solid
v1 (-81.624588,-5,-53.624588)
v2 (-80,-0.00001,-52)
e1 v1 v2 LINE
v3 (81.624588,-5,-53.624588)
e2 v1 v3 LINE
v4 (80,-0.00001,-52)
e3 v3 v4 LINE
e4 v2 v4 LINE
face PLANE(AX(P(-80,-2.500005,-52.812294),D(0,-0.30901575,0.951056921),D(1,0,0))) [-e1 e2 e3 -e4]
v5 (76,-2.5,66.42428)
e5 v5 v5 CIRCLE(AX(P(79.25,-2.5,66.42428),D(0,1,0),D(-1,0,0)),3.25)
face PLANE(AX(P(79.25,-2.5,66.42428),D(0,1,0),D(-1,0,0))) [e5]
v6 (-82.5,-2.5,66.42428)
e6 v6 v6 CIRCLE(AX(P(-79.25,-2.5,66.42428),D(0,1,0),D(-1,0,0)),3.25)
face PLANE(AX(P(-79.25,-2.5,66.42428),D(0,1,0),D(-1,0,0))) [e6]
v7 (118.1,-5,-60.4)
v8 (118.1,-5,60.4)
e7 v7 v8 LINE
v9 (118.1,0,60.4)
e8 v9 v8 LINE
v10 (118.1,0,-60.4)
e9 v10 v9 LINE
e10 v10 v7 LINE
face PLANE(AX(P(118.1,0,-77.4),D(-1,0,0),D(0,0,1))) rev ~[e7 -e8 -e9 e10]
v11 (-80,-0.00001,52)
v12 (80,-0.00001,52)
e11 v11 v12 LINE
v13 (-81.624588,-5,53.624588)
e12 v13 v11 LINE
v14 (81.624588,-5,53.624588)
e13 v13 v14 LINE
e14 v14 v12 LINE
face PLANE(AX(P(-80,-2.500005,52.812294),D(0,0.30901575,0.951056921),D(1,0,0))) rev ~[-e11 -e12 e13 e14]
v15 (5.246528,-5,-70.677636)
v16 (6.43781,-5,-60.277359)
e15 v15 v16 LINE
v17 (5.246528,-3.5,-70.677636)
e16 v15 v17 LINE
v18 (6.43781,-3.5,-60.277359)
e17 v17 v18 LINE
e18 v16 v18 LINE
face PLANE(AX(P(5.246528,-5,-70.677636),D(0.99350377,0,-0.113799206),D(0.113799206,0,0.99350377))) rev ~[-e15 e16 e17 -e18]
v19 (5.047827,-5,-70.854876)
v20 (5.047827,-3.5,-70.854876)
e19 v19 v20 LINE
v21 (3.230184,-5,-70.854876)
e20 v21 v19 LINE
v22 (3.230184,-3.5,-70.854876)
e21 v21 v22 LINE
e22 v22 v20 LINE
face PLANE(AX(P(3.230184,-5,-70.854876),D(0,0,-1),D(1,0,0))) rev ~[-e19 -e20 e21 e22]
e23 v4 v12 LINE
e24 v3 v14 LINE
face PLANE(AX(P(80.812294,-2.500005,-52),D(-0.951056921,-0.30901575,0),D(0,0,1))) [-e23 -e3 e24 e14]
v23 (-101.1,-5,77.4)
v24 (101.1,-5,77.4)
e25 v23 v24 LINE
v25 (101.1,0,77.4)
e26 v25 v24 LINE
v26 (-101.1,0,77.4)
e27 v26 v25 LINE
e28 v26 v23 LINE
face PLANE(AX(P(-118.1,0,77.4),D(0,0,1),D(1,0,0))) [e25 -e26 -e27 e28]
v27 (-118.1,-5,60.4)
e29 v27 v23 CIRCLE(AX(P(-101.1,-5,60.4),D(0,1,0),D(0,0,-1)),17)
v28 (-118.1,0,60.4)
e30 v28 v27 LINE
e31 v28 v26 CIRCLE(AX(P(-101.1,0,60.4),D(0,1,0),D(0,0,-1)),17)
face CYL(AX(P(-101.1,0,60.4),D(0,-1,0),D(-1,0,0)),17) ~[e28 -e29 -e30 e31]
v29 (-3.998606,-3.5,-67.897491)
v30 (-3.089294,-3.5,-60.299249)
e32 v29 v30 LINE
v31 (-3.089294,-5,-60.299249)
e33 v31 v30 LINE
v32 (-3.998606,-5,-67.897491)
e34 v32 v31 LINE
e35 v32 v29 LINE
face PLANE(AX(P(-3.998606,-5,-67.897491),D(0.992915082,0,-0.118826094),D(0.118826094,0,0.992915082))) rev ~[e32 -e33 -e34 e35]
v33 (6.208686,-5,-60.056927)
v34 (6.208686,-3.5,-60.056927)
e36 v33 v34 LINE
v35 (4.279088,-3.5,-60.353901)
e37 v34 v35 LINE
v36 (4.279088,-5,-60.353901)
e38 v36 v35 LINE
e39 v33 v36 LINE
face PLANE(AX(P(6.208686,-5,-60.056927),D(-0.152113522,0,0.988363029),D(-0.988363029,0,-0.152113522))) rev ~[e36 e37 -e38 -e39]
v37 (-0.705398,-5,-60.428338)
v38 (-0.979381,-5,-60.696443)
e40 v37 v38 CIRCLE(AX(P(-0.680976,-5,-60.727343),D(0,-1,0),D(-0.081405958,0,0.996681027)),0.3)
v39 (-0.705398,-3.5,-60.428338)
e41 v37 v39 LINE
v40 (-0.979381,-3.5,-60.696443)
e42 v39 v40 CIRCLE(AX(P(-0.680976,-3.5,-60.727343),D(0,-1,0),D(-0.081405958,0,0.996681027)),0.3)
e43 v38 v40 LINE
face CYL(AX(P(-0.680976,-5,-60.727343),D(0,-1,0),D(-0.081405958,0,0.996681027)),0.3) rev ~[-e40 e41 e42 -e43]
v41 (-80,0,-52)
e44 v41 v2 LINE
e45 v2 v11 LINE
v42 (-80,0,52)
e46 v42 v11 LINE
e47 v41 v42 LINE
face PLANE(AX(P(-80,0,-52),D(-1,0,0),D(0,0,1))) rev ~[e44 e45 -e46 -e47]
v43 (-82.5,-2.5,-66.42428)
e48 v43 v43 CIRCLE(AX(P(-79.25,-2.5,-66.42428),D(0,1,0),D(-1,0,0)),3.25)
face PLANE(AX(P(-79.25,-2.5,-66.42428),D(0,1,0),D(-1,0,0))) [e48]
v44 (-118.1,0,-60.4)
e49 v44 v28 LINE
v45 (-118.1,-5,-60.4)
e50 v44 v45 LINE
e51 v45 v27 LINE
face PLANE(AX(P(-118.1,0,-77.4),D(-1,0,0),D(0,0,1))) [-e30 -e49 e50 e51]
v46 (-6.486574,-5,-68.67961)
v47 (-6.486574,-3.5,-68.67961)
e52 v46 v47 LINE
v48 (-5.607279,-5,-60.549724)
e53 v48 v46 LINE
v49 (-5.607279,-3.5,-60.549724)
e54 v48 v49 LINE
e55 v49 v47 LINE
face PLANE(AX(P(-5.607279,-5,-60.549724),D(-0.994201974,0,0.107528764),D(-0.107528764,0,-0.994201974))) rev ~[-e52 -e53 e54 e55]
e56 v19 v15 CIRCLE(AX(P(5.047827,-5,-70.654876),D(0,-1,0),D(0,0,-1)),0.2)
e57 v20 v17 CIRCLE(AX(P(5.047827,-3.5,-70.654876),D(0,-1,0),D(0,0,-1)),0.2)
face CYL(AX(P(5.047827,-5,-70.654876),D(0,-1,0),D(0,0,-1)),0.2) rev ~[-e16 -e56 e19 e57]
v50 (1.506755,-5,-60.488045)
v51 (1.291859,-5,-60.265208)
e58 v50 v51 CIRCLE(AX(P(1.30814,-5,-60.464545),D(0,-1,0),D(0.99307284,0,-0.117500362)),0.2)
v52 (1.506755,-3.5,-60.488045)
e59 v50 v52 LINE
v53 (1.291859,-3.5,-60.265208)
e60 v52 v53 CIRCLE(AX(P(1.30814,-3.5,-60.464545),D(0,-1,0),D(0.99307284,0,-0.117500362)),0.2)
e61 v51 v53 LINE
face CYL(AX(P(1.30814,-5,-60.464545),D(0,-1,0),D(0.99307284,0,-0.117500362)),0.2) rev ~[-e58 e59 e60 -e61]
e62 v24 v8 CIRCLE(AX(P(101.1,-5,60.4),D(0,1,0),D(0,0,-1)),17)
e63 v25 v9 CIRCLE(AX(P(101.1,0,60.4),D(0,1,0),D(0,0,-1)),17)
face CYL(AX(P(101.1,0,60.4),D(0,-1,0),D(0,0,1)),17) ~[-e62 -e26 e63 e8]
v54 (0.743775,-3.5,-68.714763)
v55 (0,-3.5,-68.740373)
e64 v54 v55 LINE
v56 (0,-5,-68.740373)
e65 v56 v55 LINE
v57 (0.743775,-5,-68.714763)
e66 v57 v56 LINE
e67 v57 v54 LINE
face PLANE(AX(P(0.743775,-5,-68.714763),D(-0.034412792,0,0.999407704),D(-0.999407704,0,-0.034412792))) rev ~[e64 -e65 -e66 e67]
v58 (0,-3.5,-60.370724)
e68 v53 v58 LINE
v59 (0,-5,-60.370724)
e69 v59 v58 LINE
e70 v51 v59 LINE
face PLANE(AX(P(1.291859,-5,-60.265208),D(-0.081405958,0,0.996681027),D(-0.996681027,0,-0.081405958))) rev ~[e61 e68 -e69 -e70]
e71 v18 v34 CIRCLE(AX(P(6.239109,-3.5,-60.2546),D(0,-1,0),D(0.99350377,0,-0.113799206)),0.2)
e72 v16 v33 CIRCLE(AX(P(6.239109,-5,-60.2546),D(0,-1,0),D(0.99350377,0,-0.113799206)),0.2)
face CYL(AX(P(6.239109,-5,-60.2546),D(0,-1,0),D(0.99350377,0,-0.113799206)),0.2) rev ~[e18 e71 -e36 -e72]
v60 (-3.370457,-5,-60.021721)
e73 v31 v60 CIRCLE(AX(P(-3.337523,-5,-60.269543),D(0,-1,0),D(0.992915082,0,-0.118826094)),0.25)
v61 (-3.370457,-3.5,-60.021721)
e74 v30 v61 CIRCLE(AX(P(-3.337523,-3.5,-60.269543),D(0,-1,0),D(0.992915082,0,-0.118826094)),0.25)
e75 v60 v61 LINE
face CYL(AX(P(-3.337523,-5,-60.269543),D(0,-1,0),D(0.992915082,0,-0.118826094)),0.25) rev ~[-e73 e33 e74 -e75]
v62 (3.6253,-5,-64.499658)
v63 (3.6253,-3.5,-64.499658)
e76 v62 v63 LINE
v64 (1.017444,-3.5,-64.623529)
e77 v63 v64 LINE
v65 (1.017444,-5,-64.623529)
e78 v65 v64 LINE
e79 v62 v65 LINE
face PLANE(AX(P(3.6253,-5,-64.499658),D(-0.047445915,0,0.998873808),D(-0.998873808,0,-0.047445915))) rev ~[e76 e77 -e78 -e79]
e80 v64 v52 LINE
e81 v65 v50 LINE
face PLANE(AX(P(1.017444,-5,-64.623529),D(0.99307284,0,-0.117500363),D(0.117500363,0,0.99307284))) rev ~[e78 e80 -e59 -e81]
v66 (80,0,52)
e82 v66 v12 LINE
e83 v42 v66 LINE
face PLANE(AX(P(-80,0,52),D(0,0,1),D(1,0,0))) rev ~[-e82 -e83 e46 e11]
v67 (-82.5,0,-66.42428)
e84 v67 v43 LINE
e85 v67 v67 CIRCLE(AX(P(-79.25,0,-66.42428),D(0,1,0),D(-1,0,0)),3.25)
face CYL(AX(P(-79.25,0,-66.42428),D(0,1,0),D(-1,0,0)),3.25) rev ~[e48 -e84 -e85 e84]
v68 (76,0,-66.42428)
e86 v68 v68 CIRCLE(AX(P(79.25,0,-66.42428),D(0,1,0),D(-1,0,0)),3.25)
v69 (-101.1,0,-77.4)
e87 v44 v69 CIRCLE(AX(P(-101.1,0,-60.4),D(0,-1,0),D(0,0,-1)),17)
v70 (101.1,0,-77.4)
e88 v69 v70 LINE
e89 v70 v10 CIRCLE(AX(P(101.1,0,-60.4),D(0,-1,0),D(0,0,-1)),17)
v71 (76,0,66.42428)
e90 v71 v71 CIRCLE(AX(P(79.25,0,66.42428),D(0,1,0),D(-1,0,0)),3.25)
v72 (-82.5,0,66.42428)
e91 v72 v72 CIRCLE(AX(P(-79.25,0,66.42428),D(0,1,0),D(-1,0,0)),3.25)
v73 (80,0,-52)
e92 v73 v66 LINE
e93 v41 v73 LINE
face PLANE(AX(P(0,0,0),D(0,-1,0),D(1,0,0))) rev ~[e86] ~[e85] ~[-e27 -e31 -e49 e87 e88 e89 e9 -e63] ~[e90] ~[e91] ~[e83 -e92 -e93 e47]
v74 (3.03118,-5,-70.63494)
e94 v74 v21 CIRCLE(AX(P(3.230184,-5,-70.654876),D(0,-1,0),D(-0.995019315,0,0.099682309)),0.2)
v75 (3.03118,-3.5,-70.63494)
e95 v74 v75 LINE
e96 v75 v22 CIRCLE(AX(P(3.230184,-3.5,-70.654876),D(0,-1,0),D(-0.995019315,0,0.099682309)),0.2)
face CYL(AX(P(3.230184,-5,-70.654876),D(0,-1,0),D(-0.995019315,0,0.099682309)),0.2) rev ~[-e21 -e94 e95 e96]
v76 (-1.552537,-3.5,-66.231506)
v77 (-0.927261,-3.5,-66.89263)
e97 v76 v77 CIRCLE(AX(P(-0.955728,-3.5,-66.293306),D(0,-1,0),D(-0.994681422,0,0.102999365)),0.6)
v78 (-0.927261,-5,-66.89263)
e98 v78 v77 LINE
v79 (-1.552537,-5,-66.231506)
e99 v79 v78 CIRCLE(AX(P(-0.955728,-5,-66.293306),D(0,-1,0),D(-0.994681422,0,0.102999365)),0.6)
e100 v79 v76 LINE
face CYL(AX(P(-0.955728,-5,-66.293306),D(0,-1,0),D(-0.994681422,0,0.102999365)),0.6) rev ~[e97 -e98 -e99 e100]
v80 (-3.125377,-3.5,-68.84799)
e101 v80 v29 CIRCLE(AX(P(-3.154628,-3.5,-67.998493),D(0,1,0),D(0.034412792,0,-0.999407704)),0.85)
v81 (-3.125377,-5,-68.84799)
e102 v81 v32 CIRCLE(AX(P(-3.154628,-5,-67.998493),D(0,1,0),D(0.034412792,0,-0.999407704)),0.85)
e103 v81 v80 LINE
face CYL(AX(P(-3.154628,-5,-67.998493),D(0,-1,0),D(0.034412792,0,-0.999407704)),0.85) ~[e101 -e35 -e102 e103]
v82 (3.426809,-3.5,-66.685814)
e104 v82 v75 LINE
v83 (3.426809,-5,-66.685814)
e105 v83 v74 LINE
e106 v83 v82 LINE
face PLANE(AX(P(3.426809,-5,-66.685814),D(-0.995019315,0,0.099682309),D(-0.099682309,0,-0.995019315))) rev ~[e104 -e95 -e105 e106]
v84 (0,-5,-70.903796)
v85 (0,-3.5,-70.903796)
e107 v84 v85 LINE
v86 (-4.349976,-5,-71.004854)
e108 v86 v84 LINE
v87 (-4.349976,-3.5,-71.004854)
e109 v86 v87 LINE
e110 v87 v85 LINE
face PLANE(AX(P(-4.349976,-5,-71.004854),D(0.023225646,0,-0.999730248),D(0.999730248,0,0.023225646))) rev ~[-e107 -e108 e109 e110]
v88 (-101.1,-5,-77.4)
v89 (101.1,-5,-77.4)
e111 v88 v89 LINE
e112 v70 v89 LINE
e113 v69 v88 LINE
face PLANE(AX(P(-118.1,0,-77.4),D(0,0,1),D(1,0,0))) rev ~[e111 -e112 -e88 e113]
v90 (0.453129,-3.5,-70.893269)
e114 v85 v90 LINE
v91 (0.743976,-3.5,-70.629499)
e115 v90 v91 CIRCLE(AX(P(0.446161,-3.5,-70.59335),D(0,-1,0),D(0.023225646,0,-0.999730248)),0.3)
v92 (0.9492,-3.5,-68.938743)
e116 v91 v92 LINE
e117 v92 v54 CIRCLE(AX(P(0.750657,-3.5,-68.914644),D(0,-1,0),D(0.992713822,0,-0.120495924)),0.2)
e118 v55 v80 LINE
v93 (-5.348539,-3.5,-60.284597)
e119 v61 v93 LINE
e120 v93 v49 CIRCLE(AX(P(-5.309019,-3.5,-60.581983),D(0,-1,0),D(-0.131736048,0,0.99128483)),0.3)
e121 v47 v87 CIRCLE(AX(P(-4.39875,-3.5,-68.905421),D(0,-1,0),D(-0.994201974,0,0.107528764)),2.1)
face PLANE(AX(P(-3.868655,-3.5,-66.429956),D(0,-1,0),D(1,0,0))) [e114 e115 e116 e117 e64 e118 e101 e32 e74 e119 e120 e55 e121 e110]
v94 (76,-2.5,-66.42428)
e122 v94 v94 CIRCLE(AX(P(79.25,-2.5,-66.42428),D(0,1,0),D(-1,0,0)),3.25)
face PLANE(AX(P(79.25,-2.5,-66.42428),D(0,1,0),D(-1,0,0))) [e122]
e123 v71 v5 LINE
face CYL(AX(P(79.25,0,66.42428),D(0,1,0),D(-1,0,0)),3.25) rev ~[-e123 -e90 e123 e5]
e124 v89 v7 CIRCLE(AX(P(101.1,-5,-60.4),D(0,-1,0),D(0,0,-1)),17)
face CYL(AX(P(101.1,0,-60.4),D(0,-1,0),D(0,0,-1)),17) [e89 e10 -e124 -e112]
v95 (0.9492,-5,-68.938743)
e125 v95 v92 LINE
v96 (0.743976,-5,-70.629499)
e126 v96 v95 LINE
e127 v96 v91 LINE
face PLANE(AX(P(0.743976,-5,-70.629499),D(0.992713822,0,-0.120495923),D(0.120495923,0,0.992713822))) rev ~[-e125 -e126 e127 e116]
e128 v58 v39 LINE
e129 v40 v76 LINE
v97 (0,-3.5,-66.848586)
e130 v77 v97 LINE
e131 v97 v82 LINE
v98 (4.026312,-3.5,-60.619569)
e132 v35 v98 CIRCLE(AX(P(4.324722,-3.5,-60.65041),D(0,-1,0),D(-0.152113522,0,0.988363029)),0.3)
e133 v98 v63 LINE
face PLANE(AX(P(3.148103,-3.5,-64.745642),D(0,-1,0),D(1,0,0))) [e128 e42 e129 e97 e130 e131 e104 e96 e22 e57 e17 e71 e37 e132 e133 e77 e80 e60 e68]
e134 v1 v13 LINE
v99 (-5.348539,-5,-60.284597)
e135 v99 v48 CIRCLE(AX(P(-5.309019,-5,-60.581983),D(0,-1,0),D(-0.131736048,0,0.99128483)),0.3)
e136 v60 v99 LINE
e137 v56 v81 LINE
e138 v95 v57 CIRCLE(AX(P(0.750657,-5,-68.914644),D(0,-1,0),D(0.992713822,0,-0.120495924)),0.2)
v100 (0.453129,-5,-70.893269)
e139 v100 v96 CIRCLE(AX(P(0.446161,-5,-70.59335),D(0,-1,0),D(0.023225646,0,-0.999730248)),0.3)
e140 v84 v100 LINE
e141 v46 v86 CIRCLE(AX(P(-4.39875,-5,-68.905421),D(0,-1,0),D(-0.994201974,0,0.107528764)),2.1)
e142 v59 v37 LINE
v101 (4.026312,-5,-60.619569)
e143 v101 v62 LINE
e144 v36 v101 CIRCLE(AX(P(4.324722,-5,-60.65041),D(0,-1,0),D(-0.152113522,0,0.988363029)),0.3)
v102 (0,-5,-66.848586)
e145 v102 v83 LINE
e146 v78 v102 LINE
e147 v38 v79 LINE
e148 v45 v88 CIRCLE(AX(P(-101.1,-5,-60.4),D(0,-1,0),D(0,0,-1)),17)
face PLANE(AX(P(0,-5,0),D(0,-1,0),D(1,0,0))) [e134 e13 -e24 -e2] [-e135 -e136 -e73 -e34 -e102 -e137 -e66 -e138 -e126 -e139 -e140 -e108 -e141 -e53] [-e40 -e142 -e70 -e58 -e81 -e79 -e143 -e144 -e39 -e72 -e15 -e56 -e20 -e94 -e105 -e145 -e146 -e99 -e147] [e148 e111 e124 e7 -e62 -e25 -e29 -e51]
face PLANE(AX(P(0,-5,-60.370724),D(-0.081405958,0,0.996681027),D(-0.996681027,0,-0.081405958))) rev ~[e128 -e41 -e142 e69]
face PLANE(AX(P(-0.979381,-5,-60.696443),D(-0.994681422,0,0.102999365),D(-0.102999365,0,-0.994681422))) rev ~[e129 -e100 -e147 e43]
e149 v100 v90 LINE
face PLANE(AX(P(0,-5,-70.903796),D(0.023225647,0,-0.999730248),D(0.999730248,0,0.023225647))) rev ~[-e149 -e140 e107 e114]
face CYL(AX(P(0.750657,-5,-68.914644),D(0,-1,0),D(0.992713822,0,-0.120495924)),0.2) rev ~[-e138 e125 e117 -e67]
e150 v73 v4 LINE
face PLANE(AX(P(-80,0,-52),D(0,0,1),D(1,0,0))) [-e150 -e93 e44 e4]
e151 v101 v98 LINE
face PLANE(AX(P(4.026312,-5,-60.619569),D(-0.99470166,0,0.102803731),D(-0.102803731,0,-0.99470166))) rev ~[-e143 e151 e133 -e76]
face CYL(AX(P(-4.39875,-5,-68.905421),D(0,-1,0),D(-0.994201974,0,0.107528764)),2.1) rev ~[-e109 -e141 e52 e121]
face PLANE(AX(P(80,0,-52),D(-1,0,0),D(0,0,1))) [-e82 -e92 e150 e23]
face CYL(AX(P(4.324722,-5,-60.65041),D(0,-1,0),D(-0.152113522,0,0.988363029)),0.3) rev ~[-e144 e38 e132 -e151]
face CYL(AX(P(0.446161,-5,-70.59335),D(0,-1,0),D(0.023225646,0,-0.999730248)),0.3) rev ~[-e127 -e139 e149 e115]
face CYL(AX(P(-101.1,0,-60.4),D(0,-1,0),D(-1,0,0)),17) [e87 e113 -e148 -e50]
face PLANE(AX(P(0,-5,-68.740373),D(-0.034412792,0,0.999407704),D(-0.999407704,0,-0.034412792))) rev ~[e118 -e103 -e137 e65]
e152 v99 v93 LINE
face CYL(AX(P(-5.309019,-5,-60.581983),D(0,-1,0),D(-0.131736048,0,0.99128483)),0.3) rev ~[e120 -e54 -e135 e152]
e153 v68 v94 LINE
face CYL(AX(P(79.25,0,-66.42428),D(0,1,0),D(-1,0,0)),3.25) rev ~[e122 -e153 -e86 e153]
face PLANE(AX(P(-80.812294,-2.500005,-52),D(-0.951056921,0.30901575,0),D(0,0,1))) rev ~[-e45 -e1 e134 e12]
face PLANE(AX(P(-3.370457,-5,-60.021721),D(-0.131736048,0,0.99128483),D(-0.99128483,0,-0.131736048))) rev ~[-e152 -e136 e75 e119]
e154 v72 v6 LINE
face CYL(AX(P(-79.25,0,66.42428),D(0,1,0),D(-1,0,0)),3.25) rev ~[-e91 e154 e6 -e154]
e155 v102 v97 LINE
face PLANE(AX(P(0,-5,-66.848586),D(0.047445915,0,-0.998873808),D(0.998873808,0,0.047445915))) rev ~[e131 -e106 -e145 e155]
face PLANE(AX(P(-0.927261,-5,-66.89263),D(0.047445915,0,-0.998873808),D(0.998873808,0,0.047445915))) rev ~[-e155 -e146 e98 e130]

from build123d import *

# Parameters (mm, degrees)
F0_W     = 236.2
F0_H     = 154.8
F0_W_2   = 160
F0_H_2   = 104
F1_DEPTH = 5
F2_R     = 17
F3_R     = 3.25
F4_DEPTH = 2.5
F5_SIZE2 = 4.99999
F5_SIZE  = 1.624588
F7_DEPTH = 1.5


# Not quite as in the source:
# - a fillet or chamfer is up to 0.001 mm smaller than in the source, because OpenCascade refuses the exact size


with BuildPart() as f1:
    # F0 (on Front) → F1 (new body)
    with BuildSketch(Plane.XZ):
        Rectangle(F0_W, F0_H)
        Rectangle(F0_W_2, F0_H_2, mode=Mode.SUBTRACT)
    extrude(amount=F1_DEPTH)

    # F2
    f2_edges = [f1.edges().sort_by_distance(p)[0] for p in [
        (-118.1, -2.5, 77.4),
        (118.1, -2.5, 77.4),
        (-118.1, -2.5, -77.4),
        (118.1, -2.5, -77.4),
    ]]
    fillet(f2_edges, radius=F2_R)

    # F3 (on face) → F4 (cut)
    with BuildSketch(Plane(origin=(0, 0, 0), x_dir=(-1, 0, 0), z_dir=(0, 1, 0))):
        with Locations((-79.25, 66.42428)):
            Circle(F3_R)
        with Locations((-79.25, -66.42428)):
            Circle(F3_R)
        with Locations((79.25, 66.42428)):
            Circle(F3_R)
        with Locations((79.25, -66.42428)):
            Circle(F3_R)
    extrude(amount=-F4_DEPTH, mode=Mode.SUBTRACT)

    # F5 (size 1.6245984812 and 5 in the source; OpenCascade refuses exactly that, so slightly less here)
    f5_edges = [f1.edges().sort_by_distance(p)[0] for p in [
        (-80, -5, 0),
        (0, -5, 52),
        (80, -5, 0),
        (0, -5, -52),
    ]]
    f5_side = f1.faces().sort_by_distance((0, -5, 74.575934))[0]
    chamfer(f5_edges, length=F5_SIZE, length2=F5_SIZE2, reference=f5_side)

    # F6 (on face) → F7 (cut)
    with BuildSketch(Plane.XZ.offset(5)):
        with BuildLine():
            Line((0, -70.9037960887), (0, -68.7403732376))
            Line((0, -68.7403732376), (-3.125376912, -68.8479899255))
            ThreePointArc((-3.125376912, -68.8479899255), (-3.7805726372, -68.5735525412), (-3.998605605, -67.897491197))
            Line((-3.998605605, -67.897491197), (-3.0892937711, -60.2992490469))
            ThreePointArc((-3.0892937711, -60.2992490469), (-3.1618997395, -60.0916194181), (-3.3704565536, -60.021721316))
            Line((-3.3704565536, -60.021721316), (-5.3485393199, -60.2845971301))
            ThreePointArc((-5.3485393199, -60.2845971301), (-5.5237209211, -60.3724524554), (-5.6072790976, -60.5497239497))
            Line((-5.6072790976, -60.5497239497), (-6.4865739197, -68.6796104252))
            ThreePointArc((-6.4865739197, -68.6796104252), (-5.9450748854, -70.3262933271), (-4.3499759171, -71.004854352))
            Line((-4.3499759171, -71.004854352), (0, -70.9037960887))
        make_face()
        with BuildLine():
            Line((1.2918589674, -60.2652083751), (0, -60.3707235945))
            Line((0, -60.3707235945), (0, -66.8485857862))
            Line((0, -66.8485857862), (3.4268085146, -66.6858144104))
            Line((3.4268085146, -66.6858144104), (3.0311800837, -70.6349397286))
            ThreePointArc((3.0311800837, -70.6349397286), (3.0818813973, -70.7890639463), (3.2301839467, -70.8548761904))
            Line((3.2301839467, -70.8548761904), (5.0478271442, -70.8548761904))
            ThreePointArc((5.0478271442, -70.8548761904), (5.1809587177, -70.8041276029), (5.2465278981, -70.6776360316))
            Line((5.2465278981, -70.6776360316), (6.4378099563, -60.2773594464))
            ThreePointArc((6.4378099563, -60.2773594464), (6.3777706296, -60.1104711604), (6.2086864979, -60.0569269995))
            Line((6.2086864979, -60.0569269995), (4.2790884308, -60.3539008339))
            ThreePointArc((4.2790884308, -60.3539008339), (4.1073828743, -60.4436163854), (4.0263119894, -60.6195686231))
            Line((4.0263119894, -60.6195686231), (3.6252996651, -64.4996576011))
            Line((3.6252996651, -64.4996576011), (1.0174442614, -64.6235291889))
            Line((1.0174442614, -64.6235291889), (1.506754727, -60.4880446531))
            ThreePointArc((1.506754727, -60.4880446531), (1.4521032332, -60.3257114675), (1.2918589674, -60.2652083751))
        make_face()
        with BuildLine():
            Line((0, -66.8485857862), (0, -60.3707235945))
            Line((0, -60.3707235945), (-0.7053982188, -60.4283384346))
            ThreePointArc((-0.7053982188, -60.4283384346), (-0.8907958695, -60.512923053), (-0.9793808578, -60.6964429332))
            Line((-0.9793808578, -60.6964429332), (-1.552537239, -66.2315062229))
            ThreePointArc((-1.552537239, -66.2315062229), (-1.3916459971, -66.7055871007), (-0.9272608372, -66.892630127))
            Line((-0.9272608372, -66.892630127), (0, -66.8485857862))
        make_face()
        with BuildLine():
            Line((0.7437746725, -68.7147627052), (0, -68.7403732376))
            Line((0, -68.7403732376), (0, -70.9037960887))
            Line((0, -70.9037960887), (0.4531291197, -70.8932690322))
            ThreePointArc((0.4531291197, -70.8932690322), (0.6476972416, -70.8155735275), (0.7439755724, -70.6294987347))
            Line((0.7439755724, -70.6294987347), (0.9491999954, -68.9387434307))
            ThreePointArc((0.9491999954, -68.9387434307), (0.8980521088, -68.7794601123), (0.7437746725, -68.7147627052))
        make_face()
    extrude(amount=-F7_DEPTH, mode=Mode.SUBTRACT)


solid = f1.part
